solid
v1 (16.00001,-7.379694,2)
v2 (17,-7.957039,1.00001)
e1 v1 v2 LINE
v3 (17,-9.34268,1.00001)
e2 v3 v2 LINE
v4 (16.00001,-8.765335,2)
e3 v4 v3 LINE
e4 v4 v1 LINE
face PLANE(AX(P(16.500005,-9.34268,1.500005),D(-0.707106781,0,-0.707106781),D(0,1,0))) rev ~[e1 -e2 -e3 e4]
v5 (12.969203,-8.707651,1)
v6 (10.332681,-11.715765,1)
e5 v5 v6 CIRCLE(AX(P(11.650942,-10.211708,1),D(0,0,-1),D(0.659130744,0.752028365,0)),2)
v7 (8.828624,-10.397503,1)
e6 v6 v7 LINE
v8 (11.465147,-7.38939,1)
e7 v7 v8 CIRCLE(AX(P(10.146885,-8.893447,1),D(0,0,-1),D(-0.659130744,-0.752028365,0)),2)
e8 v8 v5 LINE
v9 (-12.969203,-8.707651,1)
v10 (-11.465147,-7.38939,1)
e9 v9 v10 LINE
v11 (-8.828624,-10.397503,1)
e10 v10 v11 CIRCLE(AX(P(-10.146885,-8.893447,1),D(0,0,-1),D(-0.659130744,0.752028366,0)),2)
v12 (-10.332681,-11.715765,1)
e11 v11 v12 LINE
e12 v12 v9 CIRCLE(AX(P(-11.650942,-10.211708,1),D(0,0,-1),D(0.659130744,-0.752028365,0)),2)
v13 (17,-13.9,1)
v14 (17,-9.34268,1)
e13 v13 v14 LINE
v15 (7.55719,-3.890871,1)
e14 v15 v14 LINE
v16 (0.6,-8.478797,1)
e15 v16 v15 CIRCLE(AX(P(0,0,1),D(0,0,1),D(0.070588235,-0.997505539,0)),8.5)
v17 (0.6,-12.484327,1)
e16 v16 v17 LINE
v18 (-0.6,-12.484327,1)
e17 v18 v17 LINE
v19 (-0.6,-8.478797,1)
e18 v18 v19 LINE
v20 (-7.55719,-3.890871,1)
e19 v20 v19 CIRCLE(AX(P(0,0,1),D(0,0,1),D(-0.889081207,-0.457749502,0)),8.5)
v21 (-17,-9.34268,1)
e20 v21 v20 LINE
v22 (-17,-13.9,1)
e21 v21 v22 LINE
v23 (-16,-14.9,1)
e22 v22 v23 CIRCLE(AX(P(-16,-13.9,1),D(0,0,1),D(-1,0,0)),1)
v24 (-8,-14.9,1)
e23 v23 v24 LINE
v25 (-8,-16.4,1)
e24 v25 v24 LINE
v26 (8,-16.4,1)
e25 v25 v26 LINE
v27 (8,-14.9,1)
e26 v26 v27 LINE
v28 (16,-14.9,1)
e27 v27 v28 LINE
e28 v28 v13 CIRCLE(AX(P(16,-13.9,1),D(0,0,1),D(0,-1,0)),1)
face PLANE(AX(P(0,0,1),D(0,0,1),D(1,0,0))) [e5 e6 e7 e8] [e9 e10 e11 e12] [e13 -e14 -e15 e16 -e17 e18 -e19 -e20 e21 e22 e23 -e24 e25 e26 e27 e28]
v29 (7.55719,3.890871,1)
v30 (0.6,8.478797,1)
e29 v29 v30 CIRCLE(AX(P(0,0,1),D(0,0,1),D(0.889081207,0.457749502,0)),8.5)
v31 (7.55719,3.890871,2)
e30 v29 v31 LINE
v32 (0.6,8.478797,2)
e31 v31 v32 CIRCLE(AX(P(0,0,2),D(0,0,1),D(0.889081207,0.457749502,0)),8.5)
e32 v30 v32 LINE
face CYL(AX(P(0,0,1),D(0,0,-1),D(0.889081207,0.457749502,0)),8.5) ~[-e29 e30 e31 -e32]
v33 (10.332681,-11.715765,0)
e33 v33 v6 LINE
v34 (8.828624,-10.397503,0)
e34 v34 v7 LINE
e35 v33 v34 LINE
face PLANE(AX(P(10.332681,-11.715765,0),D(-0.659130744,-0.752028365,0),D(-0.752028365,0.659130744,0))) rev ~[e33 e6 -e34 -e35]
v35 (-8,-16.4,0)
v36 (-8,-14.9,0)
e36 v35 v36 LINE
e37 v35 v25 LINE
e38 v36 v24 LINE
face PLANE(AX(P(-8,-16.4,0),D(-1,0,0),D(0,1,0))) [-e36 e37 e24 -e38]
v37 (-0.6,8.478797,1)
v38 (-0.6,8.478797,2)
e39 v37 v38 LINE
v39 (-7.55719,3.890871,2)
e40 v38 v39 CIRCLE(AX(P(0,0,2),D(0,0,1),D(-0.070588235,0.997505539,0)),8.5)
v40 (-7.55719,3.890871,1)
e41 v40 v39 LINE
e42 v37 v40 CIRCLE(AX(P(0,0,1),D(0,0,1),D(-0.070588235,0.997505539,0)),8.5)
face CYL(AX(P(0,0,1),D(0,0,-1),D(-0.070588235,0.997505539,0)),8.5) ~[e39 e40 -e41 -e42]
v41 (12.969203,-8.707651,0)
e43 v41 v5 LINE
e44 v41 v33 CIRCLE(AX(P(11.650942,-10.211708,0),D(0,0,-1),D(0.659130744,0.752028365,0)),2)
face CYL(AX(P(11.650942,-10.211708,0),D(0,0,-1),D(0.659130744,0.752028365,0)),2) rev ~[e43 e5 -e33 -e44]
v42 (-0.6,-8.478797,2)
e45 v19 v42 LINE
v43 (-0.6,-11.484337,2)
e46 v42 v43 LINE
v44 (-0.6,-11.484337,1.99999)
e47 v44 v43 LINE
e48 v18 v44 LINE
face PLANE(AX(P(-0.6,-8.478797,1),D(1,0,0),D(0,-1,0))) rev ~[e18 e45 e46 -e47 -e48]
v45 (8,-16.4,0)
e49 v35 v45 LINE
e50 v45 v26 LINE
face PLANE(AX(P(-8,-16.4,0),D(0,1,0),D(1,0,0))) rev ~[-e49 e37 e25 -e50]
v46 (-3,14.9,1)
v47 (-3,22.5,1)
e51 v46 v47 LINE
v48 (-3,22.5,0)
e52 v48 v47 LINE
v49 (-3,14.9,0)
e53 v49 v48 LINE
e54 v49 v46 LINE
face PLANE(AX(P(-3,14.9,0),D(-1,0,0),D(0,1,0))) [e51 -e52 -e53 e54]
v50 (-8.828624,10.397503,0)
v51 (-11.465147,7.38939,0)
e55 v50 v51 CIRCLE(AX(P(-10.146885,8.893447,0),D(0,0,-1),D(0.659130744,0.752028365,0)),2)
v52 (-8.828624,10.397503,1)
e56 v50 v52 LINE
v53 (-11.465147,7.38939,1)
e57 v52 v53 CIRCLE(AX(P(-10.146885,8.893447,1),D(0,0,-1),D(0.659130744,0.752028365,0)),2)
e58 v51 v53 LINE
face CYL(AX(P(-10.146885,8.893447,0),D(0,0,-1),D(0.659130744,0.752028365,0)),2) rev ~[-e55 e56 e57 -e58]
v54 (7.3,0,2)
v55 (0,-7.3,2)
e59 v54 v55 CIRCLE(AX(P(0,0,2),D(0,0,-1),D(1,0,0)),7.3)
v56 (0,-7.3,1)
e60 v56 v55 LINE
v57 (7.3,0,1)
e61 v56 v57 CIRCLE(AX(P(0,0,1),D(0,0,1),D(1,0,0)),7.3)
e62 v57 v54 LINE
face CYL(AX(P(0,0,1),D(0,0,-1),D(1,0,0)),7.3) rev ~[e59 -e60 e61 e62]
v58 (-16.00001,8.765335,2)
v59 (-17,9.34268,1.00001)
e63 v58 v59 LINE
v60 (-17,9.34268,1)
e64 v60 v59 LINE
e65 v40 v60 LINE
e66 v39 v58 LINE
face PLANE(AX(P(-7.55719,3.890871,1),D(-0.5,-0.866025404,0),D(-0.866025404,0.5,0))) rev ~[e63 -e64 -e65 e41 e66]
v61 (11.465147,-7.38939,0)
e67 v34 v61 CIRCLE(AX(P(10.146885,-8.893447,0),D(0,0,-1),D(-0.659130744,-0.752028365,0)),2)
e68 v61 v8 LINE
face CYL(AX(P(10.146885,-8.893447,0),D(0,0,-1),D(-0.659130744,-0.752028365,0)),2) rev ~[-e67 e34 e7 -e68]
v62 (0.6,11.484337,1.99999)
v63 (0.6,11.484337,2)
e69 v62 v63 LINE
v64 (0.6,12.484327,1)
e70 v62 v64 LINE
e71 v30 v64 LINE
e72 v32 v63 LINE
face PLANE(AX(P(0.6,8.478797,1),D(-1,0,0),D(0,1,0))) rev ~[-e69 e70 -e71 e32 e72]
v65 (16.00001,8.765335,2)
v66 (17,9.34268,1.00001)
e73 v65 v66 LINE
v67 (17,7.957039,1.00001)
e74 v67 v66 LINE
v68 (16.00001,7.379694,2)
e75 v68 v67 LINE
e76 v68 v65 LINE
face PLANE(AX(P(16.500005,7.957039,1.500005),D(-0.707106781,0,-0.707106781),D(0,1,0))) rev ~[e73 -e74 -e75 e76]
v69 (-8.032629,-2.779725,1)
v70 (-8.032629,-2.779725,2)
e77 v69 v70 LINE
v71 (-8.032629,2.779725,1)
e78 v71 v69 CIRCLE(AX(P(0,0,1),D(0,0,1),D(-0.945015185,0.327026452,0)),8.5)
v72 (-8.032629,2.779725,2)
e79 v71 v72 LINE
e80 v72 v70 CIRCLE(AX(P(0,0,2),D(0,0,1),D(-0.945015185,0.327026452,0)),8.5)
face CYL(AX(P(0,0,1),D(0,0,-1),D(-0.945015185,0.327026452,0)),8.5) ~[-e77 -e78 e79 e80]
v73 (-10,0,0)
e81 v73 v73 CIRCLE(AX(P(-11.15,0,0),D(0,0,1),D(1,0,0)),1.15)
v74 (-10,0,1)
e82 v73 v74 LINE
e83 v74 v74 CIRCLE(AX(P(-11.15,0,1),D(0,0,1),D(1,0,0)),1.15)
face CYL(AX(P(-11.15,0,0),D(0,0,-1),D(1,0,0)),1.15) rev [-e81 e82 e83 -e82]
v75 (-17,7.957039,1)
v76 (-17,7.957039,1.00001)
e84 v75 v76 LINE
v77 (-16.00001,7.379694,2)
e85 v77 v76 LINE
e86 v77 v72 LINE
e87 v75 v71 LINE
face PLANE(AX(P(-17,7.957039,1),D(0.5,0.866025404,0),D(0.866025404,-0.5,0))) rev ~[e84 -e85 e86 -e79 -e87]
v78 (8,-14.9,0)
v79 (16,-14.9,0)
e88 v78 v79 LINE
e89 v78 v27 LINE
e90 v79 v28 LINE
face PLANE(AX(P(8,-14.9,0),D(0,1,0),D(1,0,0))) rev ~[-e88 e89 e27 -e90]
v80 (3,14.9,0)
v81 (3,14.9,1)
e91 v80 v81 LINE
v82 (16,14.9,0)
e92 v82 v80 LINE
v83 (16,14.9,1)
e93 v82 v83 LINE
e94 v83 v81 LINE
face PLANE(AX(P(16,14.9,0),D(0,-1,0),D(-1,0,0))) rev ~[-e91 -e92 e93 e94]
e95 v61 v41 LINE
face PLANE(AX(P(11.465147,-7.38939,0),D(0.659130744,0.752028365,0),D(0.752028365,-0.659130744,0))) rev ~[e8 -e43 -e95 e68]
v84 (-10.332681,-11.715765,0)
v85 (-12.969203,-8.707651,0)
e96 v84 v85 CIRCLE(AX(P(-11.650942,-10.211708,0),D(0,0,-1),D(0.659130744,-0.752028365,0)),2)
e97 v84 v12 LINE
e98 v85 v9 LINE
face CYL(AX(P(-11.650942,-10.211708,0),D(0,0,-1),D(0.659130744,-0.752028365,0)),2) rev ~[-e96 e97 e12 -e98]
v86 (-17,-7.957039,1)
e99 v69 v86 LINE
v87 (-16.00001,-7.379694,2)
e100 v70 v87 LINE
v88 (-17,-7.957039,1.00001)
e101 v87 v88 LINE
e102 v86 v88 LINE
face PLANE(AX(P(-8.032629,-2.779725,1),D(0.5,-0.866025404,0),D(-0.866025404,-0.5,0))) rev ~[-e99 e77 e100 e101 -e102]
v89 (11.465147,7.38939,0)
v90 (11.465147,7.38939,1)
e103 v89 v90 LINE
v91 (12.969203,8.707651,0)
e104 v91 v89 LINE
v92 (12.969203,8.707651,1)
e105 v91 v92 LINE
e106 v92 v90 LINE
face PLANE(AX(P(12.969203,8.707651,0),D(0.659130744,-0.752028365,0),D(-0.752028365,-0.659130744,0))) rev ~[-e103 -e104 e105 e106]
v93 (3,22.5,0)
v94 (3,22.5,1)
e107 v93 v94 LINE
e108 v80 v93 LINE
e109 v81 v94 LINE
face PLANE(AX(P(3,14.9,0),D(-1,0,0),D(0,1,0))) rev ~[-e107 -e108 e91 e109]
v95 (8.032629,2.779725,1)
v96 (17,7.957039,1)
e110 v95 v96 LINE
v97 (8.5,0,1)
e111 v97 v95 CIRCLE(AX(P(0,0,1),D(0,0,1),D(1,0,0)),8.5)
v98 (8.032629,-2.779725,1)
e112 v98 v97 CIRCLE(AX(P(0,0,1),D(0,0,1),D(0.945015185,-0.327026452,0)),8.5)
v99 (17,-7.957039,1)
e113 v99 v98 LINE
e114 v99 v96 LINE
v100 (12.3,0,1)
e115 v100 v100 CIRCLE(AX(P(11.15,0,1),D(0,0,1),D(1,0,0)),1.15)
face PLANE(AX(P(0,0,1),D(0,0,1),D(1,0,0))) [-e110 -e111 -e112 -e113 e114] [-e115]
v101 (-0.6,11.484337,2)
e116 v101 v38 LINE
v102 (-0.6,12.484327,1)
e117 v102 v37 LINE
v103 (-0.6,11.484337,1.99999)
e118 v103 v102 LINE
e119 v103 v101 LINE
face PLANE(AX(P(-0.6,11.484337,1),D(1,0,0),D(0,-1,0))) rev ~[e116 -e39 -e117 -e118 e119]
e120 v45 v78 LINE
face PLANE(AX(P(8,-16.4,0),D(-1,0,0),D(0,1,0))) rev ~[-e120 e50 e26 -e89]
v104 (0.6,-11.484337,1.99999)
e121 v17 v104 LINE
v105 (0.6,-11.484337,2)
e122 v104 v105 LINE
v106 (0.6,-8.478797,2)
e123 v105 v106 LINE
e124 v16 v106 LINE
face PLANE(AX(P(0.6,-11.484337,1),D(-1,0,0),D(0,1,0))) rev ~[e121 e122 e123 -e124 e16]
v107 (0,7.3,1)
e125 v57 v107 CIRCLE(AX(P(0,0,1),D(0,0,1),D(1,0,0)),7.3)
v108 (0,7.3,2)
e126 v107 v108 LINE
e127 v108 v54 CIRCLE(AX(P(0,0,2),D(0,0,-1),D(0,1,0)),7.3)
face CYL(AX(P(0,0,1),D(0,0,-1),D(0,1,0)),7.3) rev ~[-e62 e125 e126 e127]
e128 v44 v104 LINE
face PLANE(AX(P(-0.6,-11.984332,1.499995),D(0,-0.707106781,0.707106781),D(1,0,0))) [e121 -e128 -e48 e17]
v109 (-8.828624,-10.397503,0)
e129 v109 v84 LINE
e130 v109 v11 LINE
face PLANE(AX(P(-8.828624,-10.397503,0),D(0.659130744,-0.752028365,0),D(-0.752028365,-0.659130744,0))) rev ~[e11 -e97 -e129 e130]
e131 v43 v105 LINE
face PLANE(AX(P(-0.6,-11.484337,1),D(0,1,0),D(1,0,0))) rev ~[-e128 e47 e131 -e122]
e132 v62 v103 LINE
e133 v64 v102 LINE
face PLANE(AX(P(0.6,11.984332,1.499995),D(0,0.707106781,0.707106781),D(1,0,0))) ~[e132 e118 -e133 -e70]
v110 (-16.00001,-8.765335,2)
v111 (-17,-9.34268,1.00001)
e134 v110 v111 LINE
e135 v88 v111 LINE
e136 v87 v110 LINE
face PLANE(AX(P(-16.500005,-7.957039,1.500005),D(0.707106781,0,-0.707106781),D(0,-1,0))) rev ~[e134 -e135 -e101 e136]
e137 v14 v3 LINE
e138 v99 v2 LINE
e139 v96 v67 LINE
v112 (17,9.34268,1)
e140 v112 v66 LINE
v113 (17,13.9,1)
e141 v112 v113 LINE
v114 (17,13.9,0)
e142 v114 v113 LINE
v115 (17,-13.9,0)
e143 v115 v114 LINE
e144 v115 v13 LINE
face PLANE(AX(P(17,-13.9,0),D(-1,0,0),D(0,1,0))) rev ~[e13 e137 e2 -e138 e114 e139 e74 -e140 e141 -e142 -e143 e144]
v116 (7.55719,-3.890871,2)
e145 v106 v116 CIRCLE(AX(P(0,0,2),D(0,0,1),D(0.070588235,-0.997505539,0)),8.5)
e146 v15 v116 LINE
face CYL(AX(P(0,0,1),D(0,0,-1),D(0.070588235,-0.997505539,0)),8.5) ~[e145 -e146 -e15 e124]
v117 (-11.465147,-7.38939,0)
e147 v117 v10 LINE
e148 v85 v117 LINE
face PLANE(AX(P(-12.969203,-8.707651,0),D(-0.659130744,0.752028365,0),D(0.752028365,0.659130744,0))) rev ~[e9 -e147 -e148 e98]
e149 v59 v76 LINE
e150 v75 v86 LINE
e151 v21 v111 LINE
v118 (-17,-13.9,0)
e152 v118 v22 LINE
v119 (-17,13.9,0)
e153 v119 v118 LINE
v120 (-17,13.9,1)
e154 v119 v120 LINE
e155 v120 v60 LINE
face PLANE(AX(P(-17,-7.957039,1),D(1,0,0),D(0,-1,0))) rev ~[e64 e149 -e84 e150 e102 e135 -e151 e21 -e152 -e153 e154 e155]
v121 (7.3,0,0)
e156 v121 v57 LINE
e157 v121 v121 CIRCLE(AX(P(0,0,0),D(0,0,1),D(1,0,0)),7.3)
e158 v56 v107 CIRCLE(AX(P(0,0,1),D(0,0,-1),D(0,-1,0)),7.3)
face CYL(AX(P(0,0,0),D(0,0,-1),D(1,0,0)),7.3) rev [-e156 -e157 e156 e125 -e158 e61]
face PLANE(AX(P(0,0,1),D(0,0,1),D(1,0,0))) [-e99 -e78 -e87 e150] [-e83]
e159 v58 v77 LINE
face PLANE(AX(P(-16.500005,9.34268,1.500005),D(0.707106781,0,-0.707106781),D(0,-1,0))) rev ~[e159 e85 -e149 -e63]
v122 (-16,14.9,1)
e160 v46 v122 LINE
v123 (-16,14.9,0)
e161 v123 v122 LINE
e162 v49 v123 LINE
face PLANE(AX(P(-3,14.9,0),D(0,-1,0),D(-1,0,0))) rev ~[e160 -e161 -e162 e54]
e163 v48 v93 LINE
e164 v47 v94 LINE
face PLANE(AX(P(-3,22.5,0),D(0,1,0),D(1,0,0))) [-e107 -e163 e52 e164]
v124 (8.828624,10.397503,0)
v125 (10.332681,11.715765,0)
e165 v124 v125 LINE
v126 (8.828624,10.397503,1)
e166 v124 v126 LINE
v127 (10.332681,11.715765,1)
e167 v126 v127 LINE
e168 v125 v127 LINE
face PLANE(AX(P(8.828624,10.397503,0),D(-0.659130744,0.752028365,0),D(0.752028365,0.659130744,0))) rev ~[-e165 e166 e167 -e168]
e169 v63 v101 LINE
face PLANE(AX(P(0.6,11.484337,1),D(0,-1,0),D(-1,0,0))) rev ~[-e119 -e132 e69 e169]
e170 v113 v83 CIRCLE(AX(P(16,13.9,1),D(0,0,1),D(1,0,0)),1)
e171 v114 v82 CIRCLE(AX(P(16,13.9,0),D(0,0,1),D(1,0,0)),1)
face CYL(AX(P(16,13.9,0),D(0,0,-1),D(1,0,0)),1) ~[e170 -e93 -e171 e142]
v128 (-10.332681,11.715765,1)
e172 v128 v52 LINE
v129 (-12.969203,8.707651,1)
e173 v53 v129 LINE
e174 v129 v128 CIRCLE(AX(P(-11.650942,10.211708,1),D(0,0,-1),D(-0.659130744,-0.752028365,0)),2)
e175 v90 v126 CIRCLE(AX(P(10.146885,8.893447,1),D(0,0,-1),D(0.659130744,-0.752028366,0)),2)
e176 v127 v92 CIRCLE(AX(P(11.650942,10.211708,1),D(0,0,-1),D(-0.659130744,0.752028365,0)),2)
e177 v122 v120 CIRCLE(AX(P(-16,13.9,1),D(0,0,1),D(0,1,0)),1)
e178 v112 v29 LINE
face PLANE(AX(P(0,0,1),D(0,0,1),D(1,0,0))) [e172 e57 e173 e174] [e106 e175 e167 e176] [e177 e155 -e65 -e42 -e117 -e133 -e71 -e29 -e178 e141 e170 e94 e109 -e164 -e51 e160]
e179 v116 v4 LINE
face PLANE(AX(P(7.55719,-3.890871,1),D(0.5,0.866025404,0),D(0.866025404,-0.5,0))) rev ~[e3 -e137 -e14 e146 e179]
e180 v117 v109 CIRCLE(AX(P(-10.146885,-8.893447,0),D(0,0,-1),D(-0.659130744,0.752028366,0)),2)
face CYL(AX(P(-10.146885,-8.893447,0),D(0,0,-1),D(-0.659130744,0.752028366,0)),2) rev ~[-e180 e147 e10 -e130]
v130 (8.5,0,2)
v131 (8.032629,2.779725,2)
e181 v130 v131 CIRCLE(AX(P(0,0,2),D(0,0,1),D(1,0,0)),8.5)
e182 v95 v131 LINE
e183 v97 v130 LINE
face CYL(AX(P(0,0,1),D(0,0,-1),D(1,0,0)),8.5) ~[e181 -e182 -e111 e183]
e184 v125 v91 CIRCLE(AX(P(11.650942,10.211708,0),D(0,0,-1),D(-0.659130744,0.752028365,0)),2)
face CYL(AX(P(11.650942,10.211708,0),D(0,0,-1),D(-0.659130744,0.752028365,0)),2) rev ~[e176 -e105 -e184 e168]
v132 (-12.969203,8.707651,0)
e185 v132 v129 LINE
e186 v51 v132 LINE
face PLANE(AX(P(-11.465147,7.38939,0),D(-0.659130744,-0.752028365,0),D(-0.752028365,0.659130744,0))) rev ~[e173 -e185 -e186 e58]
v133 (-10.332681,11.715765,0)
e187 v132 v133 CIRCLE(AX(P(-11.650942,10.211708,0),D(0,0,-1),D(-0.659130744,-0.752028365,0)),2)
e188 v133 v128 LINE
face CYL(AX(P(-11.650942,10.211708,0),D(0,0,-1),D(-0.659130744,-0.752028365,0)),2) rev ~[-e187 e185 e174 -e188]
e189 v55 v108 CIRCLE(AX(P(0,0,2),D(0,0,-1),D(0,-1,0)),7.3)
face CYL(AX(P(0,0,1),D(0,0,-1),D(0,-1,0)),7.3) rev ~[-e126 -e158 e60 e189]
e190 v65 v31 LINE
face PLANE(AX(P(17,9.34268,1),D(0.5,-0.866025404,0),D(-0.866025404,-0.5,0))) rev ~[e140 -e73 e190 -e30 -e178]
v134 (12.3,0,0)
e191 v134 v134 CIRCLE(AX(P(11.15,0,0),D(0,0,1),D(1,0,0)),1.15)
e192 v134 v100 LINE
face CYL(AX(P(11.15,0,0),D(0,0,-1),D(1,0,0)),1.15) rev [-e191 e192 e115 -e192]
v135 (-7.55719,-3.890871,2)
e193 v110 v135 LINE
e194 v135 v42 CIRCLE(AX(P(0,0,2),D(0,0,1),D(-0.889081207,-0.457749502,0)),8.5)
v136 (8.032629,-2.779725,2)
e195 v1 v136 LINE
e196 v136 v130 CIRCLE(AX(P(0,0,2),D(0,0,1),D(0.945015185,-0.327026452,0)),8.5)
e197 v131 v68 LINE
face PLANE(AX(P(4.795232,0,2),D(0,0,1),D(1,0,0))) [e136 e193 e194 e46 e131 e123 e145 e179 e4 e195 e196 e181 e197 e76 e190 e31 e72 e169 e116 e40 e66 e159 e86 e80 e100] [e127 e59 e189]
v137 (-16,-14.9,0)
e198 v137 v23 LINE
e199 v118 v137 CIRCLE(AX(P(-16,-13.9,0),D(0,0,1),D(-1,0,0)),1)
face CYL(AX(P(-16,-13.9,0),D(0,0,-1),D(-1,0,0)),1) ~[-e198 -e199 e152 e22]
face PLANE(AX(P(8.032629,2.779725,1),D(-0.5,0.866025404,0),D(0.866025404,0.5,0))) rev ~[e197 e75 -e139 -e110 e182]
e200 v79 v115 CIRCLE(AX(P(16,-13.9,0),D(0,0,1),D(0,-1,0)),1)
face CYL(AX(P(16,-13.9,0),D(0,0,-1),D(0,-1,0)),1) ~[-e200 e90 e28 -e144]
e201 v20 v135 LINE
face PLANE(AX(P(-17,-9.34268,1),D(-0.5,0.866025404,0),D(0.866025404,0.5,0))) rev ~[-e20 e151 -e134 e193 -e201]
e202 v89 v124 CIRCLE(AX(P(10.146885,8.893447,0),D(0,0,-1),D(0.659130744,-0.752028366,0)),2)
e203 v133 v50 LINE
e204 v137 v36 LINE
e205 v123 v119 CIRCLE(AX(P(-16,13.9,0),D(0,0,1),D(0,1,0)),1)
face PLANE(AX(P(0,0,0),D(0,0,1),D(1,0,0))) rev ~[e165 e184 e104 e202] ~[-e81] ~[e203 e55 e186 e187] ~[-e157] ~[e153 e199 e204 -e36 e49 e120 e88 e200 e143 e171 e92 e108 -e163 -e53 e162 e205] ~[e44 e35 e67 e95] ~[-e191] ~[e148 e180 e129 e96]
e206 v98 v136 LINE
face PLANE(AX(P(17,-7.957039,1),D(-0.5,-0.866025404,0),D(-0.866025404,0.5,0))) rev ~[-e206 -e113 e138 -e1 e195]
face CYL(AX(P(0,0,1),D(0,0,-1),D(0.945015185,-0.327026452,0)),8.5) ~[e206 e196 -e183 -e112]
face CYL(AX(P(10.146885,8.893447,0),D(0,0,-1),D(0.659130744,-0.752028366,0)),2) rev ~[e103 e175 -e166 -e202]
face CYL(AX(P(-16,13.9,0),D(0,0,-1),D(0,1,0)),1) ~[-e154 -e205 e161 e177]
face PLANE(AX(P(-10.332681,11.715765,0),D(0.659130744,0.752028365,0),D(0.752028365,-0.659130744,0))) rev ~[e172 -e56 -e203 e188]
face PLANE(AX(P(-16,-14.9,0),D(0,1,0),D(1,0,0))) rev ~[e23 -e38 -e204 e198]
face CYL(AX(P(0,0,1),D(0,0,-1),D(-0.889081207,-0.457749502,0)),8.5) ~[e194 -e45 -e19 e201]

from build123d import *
from build123d import SkipClean  # not in build123d's __all__

# Parameters (mm, degrees)
F0_R     = 1.15
F0_R_2   = 7.3
F0_W     = 16
F0_H     = 1.5
F0_W_2   = 6
F0_H_2   = 7.6
F1_DEPTH = 1
F3_DEPTH = 1
F4_SIZE  = 0.99999


# Not quite as in the source:
# - a fillet or chamfer is up to 0.001 mm smaller than in the source, because OpenCascade refuses the exact size


with BuildPart() as f1:
    # F0 (on Top) → F1 (new body)
    with BuildSketch(Plane.XY):
        with BuildLine():
            Line((8, -14.9), (16, -14.9))
            ThreePointArc((16, -14.9), (16.7071067812, -14.6071067812), (17, -13.9))
            Line((17, -13.9), (17, 13.9))
            ThreePointArc((17, 13.9), (16.7071067812, 14.6071067812), (16, 14.9))
            Line((16, 14.9), (3, 14.9))
            Line((3, 14.9), (-3, 14.9))
            Line((-3, 14.9), (-16, 14.9))
            ThreePointArc((-16, 14.9), (-16.7071067812, 14.6071067812), (-17, 13.9))
            Line((-17, 13.9), (-17, -13.9))
            ThreePointArc((-17, -13.9), (-16.7071067812, -14.6071067812), (-16, -14.9))
            Line((-16, -14.9), (-8, -14.9))
            Line((-8, -14.9), (8, -14.9))
        make_face()
        with BuildLine():
            Line((-8.8286237822, -10.3975032323), (-10.3326805132, -11.71576472))
            ThreePointArc((-10.3326805132, -11.71576472), (-13.1549987319, -11.5299694768), (-12.9692034887, -8.7076512581))
            Line((-12.9692034887, -8.7076512581), (-11.4651467577, -7.3893897703))
            ThreePointArc((-11.4651467577, -7.3893897703), (-8.642828539, -7.5751850136), (-8.8286237822, -10.3975032323))
        make_face(mode=Mode.SUBTRACT)
        with Locations((-11.15, 0)):
            Circle(F0_R, mode=Mode.SUBTRACT)
        with BuildLine():
            ThreePointArc((12.9692034887, -8.7076512581), (13.1549987319, -11.5299694768), (10.3326805132, -11.71576472))
            Line((10.3326805132, -11.71576472), (8.8286237822, -10.3975032323))
            ThreePointArc((8.8286237822, -10.3975032323), (8.642828539, -7.5751850136), (11.4651467577, -7.3893897703))
            Line((11.4651467577, -7.3893897703), (12.9692034887, -8.7076512581))
        make_face(mode=Mode.SUBTRACT)
        Circle(F0_R_2, mode=Mode.SUBTRACT)
        with Locations((11.15, 0)):
            Circle(F0_R, mode=Mode.SUBTRACT)
        with BuildLine():
            Line((-11.4651467577, 7.3893897703), (-12.9692034887, 8.7076512581))
            ThreePointArc((-12.9692034887, 8.7076512581), (-13.1549987319, 11.5299694768), (-10.3326805132, 11.71576472))
            Line((-10.3326805132, 11.71576472), (-8.8286237822, 10.3975032323))
            ThreePointArc((-8.8286237822, 10.3975032323), (-8.642828539, 7.5751850136), (-11.4651467577, 7.3893897703))
        make_face(mode=Mode.SUBTRACT)
        with BuildLine():
            ThreePointArc((10.3326805132, 11.71576472), (13.1549987319, 11.5299694768), (12.9692034887, 8.7076512581))
            Line((12.9692034887, 8.7076512581), (11.4651467577, 7.3893897703))
            ThreePointArc((11.4651467577, 7.3893897703), (8.642828539, 7.5751850136), (8.8286237822, 10.3975032323))
            Line((8.8286237822, 10.3975032323), (10.3326805132, 11.71576472))
        make_face(mode=Mode.SUBTRACT)
        with Locations((0, -15.65)):
            Rectangle(F0_W, F0_H)
        with Locations((0, 18.7)):
            Rectangle(F0_W_2, F0_H_2)
    extrude(amount=F1_DEPTH)

    # F2 (on face) → F3 (join)
    with BuildSketch(Plane.XY.offset(1)):
        with BuildLine():
            ThreePointArc((0, 7.3), (5.1618795027, 5.1618795027), (7.3, 0))
            ThreePointArc((7.3, 0), (5.1618795027, -5.1618795027), (0, -7.3))
            Line((0, -7.3), (0.6, -7.3))
            Line((0.6, -7.3), (0.6, -8.4787970845))
            ThreePointArc((0.6, -8.4787970845), (4.6794449698, -7.0959703195), (7.5571902637, -3.8908707661))
            ThreePointArc((7.5571902637, -3.8908707661), (7.8146834893, -3.3437586578), (8.0326290711, -2.7797248435))
            ThreePointArc((8.0326290711, -2.7797248435), (8.3823429632, -1.4093709404), (8.5, 0))
            ThreePointArc((8.5, 0), (8.3823429632, 1.4093709404), (8.0326290711, 2.7797248435))
            ThreePointArc((8.0326290711, 2.7797248435), (7.8146834893, 3.3437586578), (7.5571902637, 3.8908707661))
            ThreePointArc((7.5571902637, 3.8908707661), (4.6794449698, 7.0959703195), (0.6, 8.4787970845))
            Line((0.6, 8.4787970845), (0.6, 7.3))
            Line((0.6, 7.3), (0, 7.3))
        make_face()
        with BuildLine():
            Line((-0.6, 7.3), (0, 7.3))
            Line((0, 7.3), (0.6, 7.3))
            Line((0.6, 7.3), (0.6, 8.4787970845))
            ThreePointArc((0.6, 8.4787970845), (0, 8.5), (-0.6, 8.4787970845))
            Line((-0.6, 8.4787970845), (-0.6, 7.3))
        make_face()
        with BuildLine():
            ThreePointArc((0, -7.3), (-7.3, 0), (0, 7.3))
            Line((0, 7.3), (-0.6, 7.3))
            Line((-0.6, 7.3), (-0.6, 8.4787970845))
            ThreePointArc((-0.6, 8.4787970845), (-4.6794449698, 7.0959703195), (-7.5571902637, 3.8908707661))
            ThreePointArc((-7.5571902637, 3.8908707661), (-7.8146834893, 3.3437586578), (-8.0326290711, 2.7797248435))
            ThreePointArc((-8.0326290711, 2.7797248435), (-8.5, 0), (-8.0326290711, -2.7797248435))
            ThreePointArc((-8.0326290711, -2.7797248435), (-7.8146834893, -3.3437586578), (-7.5571902637, -3.8908707661))
            ThreePointArc((-7.5571902637, -3.8908707661), (-4.6794449698, -7.0959703195), (-0.6, -8.4787970845))
            Line((-0.6, -8.4787970845), (-0.6, -7.3))
            Line((-0.6, -7.3), (0, -7.3))
        make_face()
        with BuildLine():
            Line((0.6, -7.3), (0, -7.3))
            Line((0, -7.3), (-0.6, -7.3))
            Line((-0.6, -7.3), (-0.6, -8.4787970845))
            ThreePointArc((-0.6, -8.4787970845), (0, -8.5), (0.6, -8.4787970845))
            Line((0.6, -8.4787970845), (0.6, -7.3))
        make_face()
        with BuildLine():
            ThreePointArc((-0.6, 8.4787970845), (0, 8.5), (0.6, 8.4787970845))
            Line((0.6, 8.4787970845), (0.6, 11.4843371598))
            Line((0.6, 11.4843371598), (-0.6, 11.4843371598))
            Line((-0.6, 11.4843371598), (-0.6, 8.4787970845))
        make_face()
        with BuildLine():
            Line((0.6, -11.4843371598), (0.6, -8.4787970845))
            ThreePointArc((0.6, -8.4787970845), (0, -8.5), (-0.6, -8.4787970845))
            Line((-0.6, -8.4787970845), (-0.6, -11.4843371598))
            Line((-0.6, -11.4843371598), (0.6, -11.4843371598))
        make_face()
        with BuildLine():
            ThreePointArc((-8.0326290711, 2.7797248435), (-7.8146834893, 3.3437586578), (-7.5571902637, 3.8908707661))
            Line((-7.5571902637, 3.8908707661), (-17, 9.3426795092))
            Line((-17, 9.3426795092), (-17, 7.9570388632))
            Line((-17, 7.9570388632), (-8.0326290711, 2.7797248435))
        make_face()
        with BuildLine():
            Line((-17, -9.3426795092), (-7.5571902637, -3.8908707661))
            ThreePointArc((-7.5571902637, -3.8908707661), (-7.8146834893, -3.3437586578), (-8.0326290711, -2.7797248435))
            Line((-8.0326290711, -2.7797248435), (-17, -7.9570388632))
            Line((-17, -7.9570388632), (-17, -9.3426795092))
        make_face()
        with BuildLine():
            ThreePointArc((8.0326290711, -2.7797248435), (7.8146834893, -3.3437586578), (7.5571902637, -3.8908707661))
            Line((7.5571902637, -3.8908707661), (17, -9.3426795092))
            Line((17, -9.3426795092), (17, -7.9570388632))
            Line((17, -7.9570388632), (8.0326290711, -2.7797248435))
        make_face()
        with BuildLine():
            Line((17, 9.3426795092), (7.5571902637, 3.8908707661))
            ThreePointArc((7.5571902637, 3.8908707661), (7.8146834893, 3.3437586578), (8.0326290711, 2.7797248435))
            Line((8.0326290711, 2.7797248435), (17, 7.9570388632))
            Line((17, 7.9570388632), (17, 9.3426795092))
        make_face()
    with SkipClean():  # cleaning this boolean's faces spoils the solid; the shape is the same uncleaned
        extrude(amount=F3_DEPTH)

    # F4 (size 1 in the source; OpenCascade refuses exactly that, so slightly less here)
    f4_edges = [f1.edges().sort_by_distance(p)[0] for p in [
        (0, 11.484337, 1),
        (0, -11.484337, 1),
        (-17, -8.649859, 2),
        (17, -8.649859, 2),
        (-17, 8.649859, 2),
        (17, 8.649859, 2),
    ]]
    chamfer(f4_edges, length=F4_SIZE)


solid = f1.part
